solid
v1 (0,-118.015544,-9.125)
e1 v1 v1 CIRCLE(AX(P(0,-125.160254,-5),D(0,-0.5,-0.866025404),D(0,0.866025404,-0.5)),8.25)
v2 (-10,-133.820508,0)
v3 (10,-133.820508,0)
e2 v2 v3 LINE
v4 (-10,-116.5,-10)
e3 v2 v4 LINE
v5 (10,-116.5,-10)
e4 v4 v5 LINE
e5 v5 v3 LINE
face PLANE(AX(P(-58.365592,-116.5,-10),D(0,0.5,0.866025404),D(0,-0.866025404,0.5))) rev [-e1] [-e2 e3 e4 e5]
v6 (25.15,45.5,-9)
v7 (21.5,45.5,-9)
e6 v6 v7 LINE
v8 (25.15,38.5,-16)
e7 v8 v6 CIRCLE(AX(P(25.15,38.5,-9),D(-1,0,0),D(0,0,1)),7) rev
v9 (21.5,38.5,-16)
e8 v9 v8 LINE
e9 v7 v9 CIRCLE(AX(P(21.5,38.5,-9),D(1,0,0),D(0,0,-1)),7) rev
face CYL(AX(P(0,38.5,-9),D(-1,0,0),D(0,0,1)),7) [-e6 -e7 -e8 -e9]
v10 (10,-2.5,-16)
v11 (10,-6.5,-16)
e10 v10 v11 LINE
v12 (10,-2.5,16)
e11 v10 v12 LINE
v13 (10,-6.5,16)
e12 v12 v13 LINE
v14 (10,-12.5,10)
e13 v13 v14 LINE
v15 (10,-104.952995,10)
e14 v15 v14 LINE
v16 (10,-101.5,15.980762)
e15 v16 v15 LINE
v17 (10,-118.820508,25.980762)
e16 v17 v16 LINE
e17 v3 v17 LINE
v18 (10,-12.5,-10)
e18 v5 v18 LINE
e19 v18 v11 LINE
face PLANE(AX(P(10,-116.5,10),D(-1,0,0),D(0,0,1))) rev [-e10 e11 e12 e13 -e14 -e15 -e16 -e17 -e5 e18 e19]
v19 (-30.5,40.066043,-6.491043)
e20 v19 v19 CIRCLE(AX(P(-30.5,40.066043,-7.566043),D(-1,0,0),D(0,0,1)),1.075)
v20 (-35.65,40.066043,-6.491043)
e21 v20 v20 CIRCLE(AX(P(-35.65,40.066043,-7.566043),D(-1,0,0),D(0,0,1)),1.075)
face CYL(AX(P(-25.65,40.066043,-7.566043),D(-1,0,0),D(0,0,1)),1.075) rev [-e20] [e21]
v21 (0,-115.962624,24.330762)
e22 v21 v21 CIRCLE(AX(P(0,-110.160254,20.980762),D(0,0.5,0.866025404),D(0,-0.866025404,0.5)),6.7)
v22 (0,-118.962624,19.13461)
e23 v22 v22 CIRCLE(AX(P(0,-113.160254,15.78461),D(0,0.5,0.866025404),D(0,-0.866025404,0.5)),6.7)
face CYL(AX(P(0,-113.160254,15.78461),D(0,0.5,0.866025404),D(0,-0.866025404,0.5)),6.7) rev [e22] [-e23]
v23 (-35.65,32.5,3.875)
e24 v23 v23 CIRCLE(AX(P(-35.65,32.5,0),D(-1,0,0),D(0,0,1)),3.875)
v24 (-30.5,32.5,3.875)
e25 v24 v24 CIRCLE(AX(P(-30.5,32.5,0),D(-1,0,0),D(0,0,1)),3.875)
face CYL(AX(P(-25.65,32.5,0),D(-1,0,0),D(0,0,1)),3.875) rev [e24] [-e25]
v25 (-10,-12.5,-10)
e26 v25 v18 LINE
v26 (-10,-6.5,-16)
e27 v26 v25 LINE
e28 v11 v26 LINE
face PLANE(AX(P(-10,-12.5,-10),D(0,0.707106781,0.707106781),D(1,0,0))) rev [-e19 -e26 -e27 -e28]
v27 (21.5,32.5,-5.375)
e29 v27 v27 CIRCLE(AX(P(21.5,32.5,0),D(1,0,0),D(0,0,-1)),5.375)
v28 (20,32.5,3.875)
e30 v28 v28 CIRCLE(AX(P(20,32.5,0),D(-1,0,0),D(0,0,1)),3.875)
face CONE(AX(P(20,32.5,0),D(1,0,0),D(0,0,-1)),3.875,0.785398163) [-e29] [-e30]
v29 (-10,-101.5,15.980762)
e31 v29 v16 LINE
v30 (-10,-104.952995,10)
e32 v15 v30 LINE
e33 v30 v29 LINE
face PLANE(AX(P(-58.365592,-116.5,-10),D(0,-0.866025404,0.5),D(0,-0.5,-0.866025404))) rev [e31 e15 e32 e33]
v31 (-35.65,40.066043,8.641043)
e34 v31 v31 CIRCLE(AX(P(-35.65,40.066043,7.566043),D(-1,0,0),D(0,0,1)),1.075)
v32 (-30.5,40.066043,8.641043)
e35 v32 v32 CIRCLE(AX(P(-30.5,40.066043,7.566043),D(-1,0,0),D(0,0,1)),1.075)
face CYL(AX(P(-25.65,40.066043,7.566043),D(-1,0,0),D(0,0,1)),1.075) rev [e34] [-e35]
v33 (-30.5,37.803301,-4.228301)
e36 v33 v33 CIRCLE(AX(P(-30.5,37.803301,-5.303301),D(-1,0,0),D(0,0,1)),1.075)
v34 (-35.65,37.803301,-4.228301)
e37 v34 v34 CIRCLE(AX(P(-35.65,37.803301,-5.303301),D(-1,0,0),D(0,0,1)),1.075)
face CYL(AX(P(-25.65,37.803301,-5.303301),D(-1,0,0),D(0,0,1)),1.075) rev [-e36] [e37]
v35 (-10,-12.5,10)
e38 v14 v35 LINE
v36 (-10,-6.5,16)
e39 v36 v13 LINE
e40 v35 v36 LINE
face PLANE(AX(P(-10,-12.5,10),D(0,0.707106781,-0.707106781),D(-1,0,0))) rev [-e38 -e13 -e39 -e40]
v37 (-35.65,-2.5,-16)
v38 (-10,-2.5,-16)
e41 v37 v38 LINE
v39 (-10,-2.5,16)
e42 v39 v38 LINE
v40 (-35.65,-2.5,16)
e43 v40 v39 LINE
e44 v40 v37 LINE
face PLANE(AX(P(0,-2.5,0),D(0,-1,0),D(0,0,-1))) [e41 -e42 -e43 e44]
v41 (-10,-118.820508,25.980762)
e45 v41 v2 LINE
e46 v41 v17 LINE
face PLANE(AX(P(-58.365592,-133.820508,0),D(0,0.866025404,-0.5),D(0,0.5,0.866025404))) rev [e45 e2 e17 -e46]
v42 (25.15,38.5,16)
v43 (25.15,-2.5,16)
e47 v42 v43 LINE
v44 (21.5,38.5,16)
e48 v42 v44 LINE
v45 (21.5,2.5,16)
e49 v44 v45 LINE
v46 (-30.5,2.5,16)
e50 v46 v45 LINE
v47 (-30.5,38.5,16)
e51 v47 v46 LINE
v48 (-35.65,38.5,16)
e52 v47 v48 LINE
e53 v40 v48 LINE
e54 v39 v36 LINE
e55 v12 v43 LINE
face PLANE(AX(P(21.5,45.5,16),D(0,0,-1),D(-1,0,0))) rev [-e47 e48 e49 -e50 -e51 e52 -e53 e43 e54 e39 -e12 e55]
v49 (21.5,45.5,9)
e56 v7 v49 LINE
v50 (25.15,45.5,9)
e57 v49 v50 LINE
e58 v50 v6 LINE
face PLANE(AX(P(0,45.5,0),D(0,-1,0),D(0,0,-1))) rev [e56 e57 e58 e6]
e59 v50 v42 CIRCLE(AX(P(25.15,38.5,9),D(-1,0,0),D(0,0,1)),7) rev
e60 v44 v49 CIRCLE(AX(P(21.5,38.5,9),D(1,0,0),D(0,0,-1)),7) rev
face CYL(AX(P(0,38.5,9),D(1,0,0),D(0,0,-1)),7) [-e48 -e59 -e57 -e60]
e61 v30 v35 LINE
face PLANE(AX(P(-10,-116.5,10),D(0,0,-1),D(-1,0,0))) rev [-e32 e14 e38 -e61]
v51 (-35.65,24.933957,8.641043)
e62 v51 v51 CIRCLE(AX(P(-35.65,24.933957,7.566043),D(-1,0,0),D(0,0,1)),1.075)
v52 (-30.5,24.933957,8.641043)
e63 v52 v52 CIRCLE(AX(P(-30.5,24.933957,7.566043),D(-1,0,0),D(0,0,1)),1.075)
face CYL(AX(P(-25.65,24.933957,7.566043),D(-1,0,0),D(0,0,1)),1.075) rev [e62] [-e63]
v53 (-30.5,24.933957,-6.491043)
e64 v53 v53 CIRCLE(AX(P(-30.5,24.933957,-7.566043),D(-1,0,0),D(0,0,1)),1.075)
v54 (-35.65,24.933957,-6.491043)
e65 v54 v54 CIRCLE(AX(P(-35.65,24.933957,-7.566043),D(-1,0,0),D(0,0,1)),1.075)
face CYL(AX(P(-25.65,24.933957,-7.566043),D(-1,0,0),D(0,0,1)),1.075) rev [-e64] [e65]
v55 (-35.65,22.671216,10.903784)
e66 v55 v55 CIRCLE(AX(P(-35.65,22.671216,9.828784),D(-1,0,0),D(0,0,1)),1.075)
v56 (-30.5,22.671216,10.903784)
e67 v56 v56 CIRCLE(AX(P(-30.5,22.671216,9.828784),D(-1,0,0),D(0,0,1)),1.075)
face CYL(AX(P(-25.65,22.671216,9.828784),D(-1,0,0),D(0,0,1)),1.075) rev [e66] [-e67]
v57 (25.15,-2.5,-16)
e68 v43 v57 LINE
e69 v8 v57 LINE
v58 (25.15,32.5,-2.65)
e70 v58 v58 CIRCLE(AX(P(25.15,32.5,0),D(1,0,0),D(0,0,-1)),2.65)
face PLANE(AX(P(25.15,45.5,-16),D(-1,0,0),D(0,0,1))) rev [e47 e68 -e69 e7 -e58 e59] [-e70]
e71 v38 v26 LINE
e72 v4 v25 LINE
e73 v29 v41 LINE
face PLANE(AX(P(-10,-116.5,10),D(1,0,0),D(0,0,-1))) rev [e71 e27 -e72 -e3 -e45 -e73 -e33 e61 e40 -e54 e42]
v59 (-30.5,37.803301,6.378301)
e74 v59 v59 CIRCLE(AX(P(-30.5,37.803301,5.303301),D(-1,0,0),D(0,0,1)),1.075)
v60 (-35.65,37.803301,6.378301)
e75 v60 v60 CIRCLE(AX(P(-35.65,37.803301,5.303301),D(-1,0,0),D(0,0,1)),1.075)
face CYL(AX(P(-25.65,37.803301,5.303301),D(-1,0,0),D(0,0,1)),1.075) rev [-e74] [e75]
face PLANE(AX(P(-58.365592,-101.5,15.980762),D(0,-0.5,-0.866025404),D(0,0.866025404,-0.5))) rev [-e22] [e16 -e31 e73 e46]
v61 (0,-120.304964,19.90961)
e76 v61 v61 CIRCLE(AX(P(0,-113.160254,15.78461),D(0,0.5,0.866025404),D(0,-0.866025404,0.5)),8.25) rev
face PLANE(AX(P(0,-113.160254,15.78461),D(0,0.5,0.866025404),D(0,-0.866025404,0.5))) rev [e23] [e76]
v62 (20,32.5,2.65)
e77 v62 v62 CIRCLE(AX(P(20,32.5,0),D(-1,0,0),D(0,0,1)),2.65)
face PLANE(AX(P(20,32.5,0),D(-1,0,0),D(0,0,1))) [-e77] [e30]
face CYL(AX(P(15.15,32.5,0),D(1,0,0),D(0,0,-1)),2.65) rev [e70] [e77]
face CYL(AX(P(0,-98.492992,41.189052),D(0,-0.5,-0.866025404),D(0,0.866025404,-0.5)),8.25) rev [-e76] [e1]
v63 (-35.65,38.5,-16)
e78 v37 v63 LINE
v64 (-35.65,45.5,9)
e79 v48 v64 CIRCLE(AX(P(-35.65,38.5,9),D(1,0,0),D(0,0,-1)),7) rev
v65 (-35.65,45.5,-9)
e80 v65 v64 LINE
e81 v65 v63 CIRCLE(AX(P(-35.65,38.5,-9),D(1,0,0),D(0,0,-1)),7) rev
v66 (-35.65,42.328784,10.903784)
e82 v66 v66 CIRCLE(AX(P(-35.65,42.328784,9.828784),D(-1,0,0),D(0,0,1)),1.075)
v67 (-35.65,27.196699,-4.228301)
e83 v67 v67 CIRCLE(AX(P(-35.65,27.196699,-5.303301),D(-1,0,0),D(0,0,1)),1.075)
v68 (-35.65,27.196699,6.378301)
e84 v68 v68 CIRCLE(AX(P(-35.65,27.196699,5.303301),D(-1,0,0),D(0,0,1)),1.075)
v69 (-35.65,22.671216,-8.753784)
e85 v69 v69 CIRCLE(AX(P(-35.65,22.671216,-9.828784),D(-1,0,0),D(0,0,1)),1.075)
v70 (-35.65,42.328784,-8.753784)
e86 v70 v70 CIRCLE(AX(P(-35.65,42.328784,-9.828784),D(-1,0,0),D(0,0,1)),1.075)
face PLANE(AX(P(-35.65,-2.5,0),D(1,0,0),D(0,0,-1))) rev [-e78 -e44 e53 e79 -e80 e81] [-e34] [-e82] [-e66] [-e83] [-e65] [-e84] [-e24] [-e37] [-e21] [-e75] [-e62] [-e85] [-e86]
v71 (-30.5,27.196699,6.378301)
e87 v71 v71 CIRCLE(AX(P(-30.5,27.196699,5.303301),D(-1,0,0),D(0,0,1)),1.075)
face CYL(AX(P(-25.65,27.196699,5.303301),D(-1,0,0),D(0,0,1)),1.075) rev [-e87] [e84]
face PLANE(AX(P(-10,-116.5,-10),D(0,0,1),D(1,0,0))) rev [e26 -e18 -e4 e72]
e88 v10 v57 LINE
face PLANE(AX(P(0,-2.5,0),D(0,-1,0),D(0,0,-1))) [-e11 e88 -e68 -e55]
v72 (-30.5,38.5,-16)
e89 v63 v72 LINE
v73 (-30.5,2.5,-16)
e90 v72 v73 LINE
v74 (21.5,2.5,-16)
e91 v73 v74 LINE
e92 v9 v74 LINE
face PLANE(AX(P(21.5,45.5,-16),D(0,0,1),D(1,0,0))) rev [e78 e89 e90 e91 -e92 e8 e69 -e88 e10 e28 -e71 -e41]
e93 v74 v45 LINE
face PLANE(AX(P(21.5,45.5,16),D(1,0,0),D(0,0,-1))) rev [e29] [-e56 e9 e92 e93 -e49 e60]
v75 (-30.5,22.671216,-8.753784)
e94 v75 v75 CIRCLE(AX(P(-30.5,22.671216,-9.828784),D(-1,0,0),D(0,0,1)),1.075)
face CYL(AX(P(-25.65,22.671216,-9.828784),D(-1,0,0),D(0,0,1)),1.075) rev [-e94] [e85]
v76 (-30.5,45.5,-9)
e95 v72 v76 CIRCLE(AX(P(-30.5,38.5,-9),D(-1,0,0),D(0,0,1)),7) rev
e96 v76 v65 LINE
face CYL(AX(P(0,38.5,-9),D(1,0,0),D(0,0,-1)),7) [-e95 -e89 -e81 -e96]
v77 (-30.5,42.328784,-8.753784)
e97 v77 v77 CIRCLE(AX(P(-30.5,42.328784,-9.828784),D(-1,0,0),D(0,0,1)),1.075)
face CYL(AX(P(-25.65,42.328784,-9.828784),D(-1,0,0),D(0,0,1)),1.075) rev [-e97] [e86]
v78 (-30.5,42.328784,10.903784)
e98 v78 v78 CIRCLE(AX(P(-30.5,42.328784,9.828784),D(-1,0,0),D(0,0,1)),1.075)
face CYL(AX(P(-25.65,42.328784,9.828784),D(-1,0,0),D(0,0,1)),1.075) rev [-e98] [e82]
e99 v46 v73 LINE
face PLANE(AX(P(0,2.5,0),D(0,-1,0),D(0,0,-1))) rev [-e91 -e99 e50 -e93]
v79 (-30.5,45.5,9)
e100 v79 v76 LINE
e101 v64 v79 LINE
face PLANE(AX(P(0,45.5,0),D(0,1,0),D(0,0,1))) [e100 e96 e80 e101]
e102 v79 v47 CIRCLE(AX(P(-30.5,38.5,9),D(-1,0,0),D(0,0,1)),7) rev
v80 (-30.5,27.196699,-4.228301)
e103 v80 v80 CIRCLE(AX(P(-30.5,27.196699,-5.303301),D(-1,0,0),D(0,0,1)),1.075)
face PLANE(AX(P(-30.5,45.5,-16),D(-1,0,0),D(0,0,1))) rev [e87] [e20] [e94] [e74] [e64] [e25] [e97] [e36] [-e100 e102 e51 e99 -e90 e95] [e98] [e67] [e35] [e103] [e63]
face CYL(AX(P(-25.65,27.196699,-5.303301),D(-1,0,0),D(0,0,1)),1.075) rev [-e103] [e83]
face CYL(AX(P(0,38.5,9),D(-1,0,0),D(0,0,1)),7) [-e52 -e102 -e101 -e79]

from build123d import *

# Parameters (mm, degrees)
SKETCH1_W           = 77.5
SKETCH1_H           = 77.5
SKETCH1_R           = 1.83
SKETCH1_R_2         = 13.5
BOSS_EXTRUDE1_DEPTH = 2.5
FILLET1_R           = 3
SKETCH2_W           = 5.15
SKETCH2_H           = 32
SKETCH2_W_2         = 3.65
BOSS_EXTRUDE2_DEPTH = 43
SKETCH3_R           = 3.875
SKETCH3_R_2         = 1.075
CUT_EXTRUDE1_DEPTH  = 10
SKETCH4_R           = 2.65
CUT_EXTRUDE2_DEPTH  = 10
SKETCH5_R           = 3.875
SKETCH5_R_2         = 2.65
BOSS_EXTRUDE3_DEPTH = 1.5
CHAMFER1_SIZE       = 1.5
SKETCH1_3_W         = 77.5
SKETCH1_3_H         = 77.5
SKETCH1_3_R         = 1.83
SKETCH1_3_R_2       = 13.5
CUT_EXTRUDE4_DEPTH  = 2.5
SKETCH6_W           = 60.8
SKETCH6_H           = 32
SKETCH6_W_2         = 30
BOSS_EXTRUDE4_DEPTH = 5
SKETCH7_W           = 20
SKETCH7_H           = 20
BOSS_EXTRUDE5_DEPTH = 114
BOSS_EXTRUDE7_DEPTH = 20
SKETCH10_R          = 8.25
CUT_EXTRUDE6_DEPTH  = 30
SKETCH11_R          = 8.25
SKETCH11_R_2        = 6.7
BOSS_EXTRUDE8_DEPTH = 6
FILLET3_R           = 7
CHAMFER2_SIZE       = 10


# Some blends are built 0.0001 mm under size
with BuildPart() as part:
    # Sketch1 → Boss-Extrude1 (new body)
    with BuildSketch(Plane(origin=(0, 0, 0), x_dir=(1, 0, 0), z_dir=(0, 1, 0))):
        Rectangle(SKETCH1_W, SKETCH1_H)
        with Locations(Location((32.75, 32.75, 0), (0, 0, 270))):
            Circle(SKETCH1_R, mode=Mode.SUBTRACT)
        with Locations(Location((32.75, -32.75, 0), (0, 0, 270))):
            Circle(SKETCH1_R, mode=Mode.SUBTRACT)
        with Locations(Location((-32.75, -32.75, 0), (0, 0, 270))):
            Circle(SKETCH1_R, mode=Mode.SUBTRACT)
        with Locations(Location((-32.75, 32.75, 0), (0, 0, 270))):
            Circle(SKETCH1_R, mode=Mode.SUBTRACT)
        with Locations(Location((0, 0, 0), (0, 0, 270))):
            Circle(SKETCH1_R_2, mode=Mode.SUBTRACT)
    extrude(amount=BOSS_EXTRUDE1_DEPTH)

    # Fillet1
    fillet1_edges = [part.edges().sort_by_distance(p)[0] for p in [
        (38.75, 1.25, 38.75),
        (-38.75, 1.25, 38.75),
        (-38.75, 1.25, -38.75),
        (38.75, 1.25, -38.75),
    ]]
    fillet(fillet1_edges, radius=FILLET1_R)

    # Sketch2 → Boss-Extrude2 (add)
    with BuildSketch(Plane(origin=(0, 2.5, 0), x_dir=(1, 0, 0), z_dir=(0, 1, 0))):
        with Locations((-33.075, 0)):
            Rectangle(SKETCH2_W, SKETCH2_H)
        with Locations((23.325, 0)):
            Rectangle(SKETCH2_W_2, SKETCH2_H)
    extrude(amount=BOSS_EXTRUDE2_DEPTH)

    # Sketch3 → Cut-Extrude1 (cut)
    with BuildSketch(Plane.ZY.offset(35.65)):
        with Locations((0, 32.5)):
            Circle(SKETCH3_R)
        with Locations((-5.303300859, 37.803300859)):
            Circle(SKETCH3_R_2)
        with Locations((5.303300859, 37.803300859)):
            Circle(SKETCH3_R_2)
        with Locations((5.303300859, 27.196699141)):
            Circle(SKETCH3_R_2)
        with Locations((-5.303300859, 27.196699141)):
            Circle(SKETCH3_R_2)
        with Locations((-7.566042559, 40.066042559)):
            Circle(SKETCH3_R_2)
        with Locations((-9.828784258, 42.328784258)):
            Circle(SKETCH3_R_2)
        with Locations((9.828784258, 42.328784258)):
            Circle(SKETCH3_R_2)
        with Locations((7.566042559, 40.066042559)):
            Circle(SKETCH3_R_2)
        with Locations((9.828784258, 22.671215742)):
            Circle(SKETCH3_R_2)
        with Locations((7.566042559, 24.933957441)):
            Circle(SKETCH3_R_2)
        with Locations((-9.828784258, 22.671215742)):
            Circle(SKETCH3_R_2)
        with Locations((-7.566042559, 24.933957441)):
            Circle(SKETCH3_R_2)
    extrude(amount=-CUT_EXTRUDE1_DEPTH, mode=Mode.SUBTRACT)

    # Sketch4 → Cut-Extrude2 (cut)
    with BuildSketch(Plane(origin=(25.15, 0, 0), x_dir=(0, 0, -1), z_dir=(1, 0, 0))):
        with Locations((0, 32.5)):
            Circle(SKETCH4_R)
    extrude(amount=-CUT_EXTRUDE2_DEPTH, mode=Mode.SUBTRACT)

    # Sketch5 → Boss-Extrude3 (add)
    with BuildSketch(Plane.ZY.offset(-21.5)):
        with Locations((0, 32.5)):
            Circle(SKETCH5_R)
        with Locations(Location((0, 32.5, 0), (0, 0, 180))):
            Circle(SKETCH5_R_2, mode=Mode.SUBTRACT)
    extrude(amount=BOSS_EXTRUDE3_DEPTH)

    # Chamfer1
    chamfer1_edges = [part.edges().sort_by_distance(p)[0] for p in [
        (21.5, 32.5, -3.875),
    ]]
    chamfer(chamfer1_edges, length=CHAMFER1_SIZE - 0.0001)  # a hair under: the kernel refuses the full size

    # Sketch1<3> → Cut-Extrude4 (cut)
    with BuildSketch(Plane(origin=(0, 0, 0), x_dir=(1, 0, 0), z_dir=(0, 1, 0))):
        Rectangle(SKETCH1_3_W, SKETCH1_3_H)
        with Locations((32.75, 32.75)):
            Circle(SKETCH1_3_R, mode=Mode.SUBTRACT)
        with Locations((32.75, -32.75)):
            Circle(SKETCH1_3_R, mode=Mode.SUBTRACT)
        with Locations((-32.75, -32.75)):
            Circle(SKETCH1_3_R, mode=Mode.SUBTRACT)
        with Locations((-32.75, 32.75)):
            Circle(SKETCH1_3_R, mode=Mode.SUBTRACT)
        Circle(SKETCH1_3_R_2, mode=Mode.SUBTRACT)
    extrude(amount=CUT_EXTRUDE4_DEPTH, mode=Mode.SUBTRACT)


with BuildPart() as cut_extrude4_piece_1:
    # of the separate pieces the step leaves, piece 1, a body of its own (cut_extrude4_pieces)
    add(part.part.solids().sort_by_distance((-35.65, 2.5, 16))[0])



with BuildPart() as cut_extrude4_piece_2:
    # of the separate pieces the step leaves, piece 2, a body of its own (cut_extrude4_pieces)
    add(part.part.solids().sort_by_distance((21.5, 32.5, 5.3749))[0])


with BuildPart() as cut_extrude4_piece_1_1:
    add(cut_extrude4_piece_1.part)

    add(cut_extrude4_piece_2.part)  # Boss-Extrude4 merges Cut-Extrude4 piece 2
    # Sketch6 → Boss-Extrude4 (add)
    with BuildSketch(Plane.XZ.offset(-2.5)):
        with Locations((-5.25, 0)):
            Rectangle(SKETCH6_W, SKETCH6_H)
        Rectangle(SKETCH6_W_2, SKETCH6_H)
    extrude(amount=BOSS_EXTRUDE4_DEPTH)

    # Sketch7 → Boss-Extrude5 (add)
    with BuildSketch(Plane.XZ.offset(2.5)):
        Rectangle(SKETCH7_W, SKETCH7_H)
    extrude(amount=BOSS_EXTRUDE5_DEPTH)

    # Sketch8 → Boss-Extrude7 (add)
    with BuildSketch(Plane.ZY.offset(-10)):
        Polygon((-10, -116.5), (0, -133.820508076), (25.980762114, -118.820508076), (15.980762114, -101.5), align=None)
    extrude(amount=BOSS_EXTRUDE7_DEPTH)

    # Sketch10 → Cut-Extrude6 (cut)
    with BuildSketch(Plane(origin=(0, -33.455127019, -57.94597977), x_dir=(-1, 0, 0), z_dir=(0, -0.49999999999999845, -0.8660254037844396))):
        with Locations(Location((0, -105.891959541, 0), (0, 0, 90))):
            Circle(SKETCH10_R)
    extrude(amount=-CUT_EXTRUDE6_DEPTH, mode=Mode.SUBTRACT)

    # Sketch11 → Boss-Extrude8 (add)
    with BuildSketch(Plane(origin=(0, -18.455127019, -31.965217657), x_dir=(1, 0, 0), z_dir=(0, 0.49999999999999845, 0.8660254037844396))):
        with Locations(Location((0, -105.891959541, 0), (0, 0, 90))):
            Circle(SKETCH11_R)
        with Locations(Location((0, -105.891959541, 0), (0, 0, 270))):
            Circle(SKETCH11_R_2, mode=Mode.SUBTRACT)
    extrude(amount=-BOSS_EXTRUDE8_DEPTH)

    # Fillet3
    fillet3_edges = [cut_extrude4_piece_1_1.edges().sort_by_distance(p)[0] for p in [
        (23.325, 45.5, 16),
        (23.325, 45.5, -16),
        (-33.075, 45.5, 16),
        (-33.075, 45.5, -16),
    ]]
    fillet(fillet3_edges, radius=FILLET3_R)

    # Chamfer2
    # the kernel refuses this chamfer: 10 mm, written as the material it adds along each edge
    with BuildSketch(Plane(origin=(-10, -2.5, 10), x_dir=(0, 0.027495876610586358, 0.9996219169112968), z_dir=(1, 0, 0))) as chamfer2_piece_1_section:
        Polygon((CHAMFER2_SIZE * 0.999621916911, CHAMFER2_SIZE * 0.0274958766106), (-CHAMFER2_SIZE * 0.0274958766106, CHAMFER2_SIZE * 0.999621916911), (0, 0), align=None)
    chamfer2_piece_1 = extrude(amount=20, mode=Mode.PRIVATE)
    chamfer2_piece_1 = split(chamfer2_piece_1, bisect_by=Plane(origin=(0, -6.250094595, 16), z_dir=(0, 0, -1)), keep=Keep.TOP, mode=Mode.PRIVATE)
    add(chamfer2_piece_1)
    with BuildSketch(Plane(origin=(10, -2.5, -10), x_dir=(0, 0.027495876610586365, -0.9996219169112968), z_dir=(-1, 0, 0))) as chamfer2_piece_2_section:
        Polygon((CHAMFER2_SIZE * 0.999621916911, CHAMFER2_SIZE * 0.0274958766106), (-CHAMFER2_SIZE * 0.0274958766106, CHAMFER2_SIZE * 0.999621916911), (0, 0), align=None)
    chamfer2_piece_2 = extrude(amount=20, mode=Mode.PRIVATE)
    chamfer2_piece_2 = split(chamfer2_piece_2, bisect_by=Plane(origin=(0, -6.250094595, -16), z_dir=(0, 0, 1)), keep=Keep.TOP, mode=Mode.PRIVATE)
    add(chamfer2_piece_2)


solid = cut_extrude4_piece_1_1.part
